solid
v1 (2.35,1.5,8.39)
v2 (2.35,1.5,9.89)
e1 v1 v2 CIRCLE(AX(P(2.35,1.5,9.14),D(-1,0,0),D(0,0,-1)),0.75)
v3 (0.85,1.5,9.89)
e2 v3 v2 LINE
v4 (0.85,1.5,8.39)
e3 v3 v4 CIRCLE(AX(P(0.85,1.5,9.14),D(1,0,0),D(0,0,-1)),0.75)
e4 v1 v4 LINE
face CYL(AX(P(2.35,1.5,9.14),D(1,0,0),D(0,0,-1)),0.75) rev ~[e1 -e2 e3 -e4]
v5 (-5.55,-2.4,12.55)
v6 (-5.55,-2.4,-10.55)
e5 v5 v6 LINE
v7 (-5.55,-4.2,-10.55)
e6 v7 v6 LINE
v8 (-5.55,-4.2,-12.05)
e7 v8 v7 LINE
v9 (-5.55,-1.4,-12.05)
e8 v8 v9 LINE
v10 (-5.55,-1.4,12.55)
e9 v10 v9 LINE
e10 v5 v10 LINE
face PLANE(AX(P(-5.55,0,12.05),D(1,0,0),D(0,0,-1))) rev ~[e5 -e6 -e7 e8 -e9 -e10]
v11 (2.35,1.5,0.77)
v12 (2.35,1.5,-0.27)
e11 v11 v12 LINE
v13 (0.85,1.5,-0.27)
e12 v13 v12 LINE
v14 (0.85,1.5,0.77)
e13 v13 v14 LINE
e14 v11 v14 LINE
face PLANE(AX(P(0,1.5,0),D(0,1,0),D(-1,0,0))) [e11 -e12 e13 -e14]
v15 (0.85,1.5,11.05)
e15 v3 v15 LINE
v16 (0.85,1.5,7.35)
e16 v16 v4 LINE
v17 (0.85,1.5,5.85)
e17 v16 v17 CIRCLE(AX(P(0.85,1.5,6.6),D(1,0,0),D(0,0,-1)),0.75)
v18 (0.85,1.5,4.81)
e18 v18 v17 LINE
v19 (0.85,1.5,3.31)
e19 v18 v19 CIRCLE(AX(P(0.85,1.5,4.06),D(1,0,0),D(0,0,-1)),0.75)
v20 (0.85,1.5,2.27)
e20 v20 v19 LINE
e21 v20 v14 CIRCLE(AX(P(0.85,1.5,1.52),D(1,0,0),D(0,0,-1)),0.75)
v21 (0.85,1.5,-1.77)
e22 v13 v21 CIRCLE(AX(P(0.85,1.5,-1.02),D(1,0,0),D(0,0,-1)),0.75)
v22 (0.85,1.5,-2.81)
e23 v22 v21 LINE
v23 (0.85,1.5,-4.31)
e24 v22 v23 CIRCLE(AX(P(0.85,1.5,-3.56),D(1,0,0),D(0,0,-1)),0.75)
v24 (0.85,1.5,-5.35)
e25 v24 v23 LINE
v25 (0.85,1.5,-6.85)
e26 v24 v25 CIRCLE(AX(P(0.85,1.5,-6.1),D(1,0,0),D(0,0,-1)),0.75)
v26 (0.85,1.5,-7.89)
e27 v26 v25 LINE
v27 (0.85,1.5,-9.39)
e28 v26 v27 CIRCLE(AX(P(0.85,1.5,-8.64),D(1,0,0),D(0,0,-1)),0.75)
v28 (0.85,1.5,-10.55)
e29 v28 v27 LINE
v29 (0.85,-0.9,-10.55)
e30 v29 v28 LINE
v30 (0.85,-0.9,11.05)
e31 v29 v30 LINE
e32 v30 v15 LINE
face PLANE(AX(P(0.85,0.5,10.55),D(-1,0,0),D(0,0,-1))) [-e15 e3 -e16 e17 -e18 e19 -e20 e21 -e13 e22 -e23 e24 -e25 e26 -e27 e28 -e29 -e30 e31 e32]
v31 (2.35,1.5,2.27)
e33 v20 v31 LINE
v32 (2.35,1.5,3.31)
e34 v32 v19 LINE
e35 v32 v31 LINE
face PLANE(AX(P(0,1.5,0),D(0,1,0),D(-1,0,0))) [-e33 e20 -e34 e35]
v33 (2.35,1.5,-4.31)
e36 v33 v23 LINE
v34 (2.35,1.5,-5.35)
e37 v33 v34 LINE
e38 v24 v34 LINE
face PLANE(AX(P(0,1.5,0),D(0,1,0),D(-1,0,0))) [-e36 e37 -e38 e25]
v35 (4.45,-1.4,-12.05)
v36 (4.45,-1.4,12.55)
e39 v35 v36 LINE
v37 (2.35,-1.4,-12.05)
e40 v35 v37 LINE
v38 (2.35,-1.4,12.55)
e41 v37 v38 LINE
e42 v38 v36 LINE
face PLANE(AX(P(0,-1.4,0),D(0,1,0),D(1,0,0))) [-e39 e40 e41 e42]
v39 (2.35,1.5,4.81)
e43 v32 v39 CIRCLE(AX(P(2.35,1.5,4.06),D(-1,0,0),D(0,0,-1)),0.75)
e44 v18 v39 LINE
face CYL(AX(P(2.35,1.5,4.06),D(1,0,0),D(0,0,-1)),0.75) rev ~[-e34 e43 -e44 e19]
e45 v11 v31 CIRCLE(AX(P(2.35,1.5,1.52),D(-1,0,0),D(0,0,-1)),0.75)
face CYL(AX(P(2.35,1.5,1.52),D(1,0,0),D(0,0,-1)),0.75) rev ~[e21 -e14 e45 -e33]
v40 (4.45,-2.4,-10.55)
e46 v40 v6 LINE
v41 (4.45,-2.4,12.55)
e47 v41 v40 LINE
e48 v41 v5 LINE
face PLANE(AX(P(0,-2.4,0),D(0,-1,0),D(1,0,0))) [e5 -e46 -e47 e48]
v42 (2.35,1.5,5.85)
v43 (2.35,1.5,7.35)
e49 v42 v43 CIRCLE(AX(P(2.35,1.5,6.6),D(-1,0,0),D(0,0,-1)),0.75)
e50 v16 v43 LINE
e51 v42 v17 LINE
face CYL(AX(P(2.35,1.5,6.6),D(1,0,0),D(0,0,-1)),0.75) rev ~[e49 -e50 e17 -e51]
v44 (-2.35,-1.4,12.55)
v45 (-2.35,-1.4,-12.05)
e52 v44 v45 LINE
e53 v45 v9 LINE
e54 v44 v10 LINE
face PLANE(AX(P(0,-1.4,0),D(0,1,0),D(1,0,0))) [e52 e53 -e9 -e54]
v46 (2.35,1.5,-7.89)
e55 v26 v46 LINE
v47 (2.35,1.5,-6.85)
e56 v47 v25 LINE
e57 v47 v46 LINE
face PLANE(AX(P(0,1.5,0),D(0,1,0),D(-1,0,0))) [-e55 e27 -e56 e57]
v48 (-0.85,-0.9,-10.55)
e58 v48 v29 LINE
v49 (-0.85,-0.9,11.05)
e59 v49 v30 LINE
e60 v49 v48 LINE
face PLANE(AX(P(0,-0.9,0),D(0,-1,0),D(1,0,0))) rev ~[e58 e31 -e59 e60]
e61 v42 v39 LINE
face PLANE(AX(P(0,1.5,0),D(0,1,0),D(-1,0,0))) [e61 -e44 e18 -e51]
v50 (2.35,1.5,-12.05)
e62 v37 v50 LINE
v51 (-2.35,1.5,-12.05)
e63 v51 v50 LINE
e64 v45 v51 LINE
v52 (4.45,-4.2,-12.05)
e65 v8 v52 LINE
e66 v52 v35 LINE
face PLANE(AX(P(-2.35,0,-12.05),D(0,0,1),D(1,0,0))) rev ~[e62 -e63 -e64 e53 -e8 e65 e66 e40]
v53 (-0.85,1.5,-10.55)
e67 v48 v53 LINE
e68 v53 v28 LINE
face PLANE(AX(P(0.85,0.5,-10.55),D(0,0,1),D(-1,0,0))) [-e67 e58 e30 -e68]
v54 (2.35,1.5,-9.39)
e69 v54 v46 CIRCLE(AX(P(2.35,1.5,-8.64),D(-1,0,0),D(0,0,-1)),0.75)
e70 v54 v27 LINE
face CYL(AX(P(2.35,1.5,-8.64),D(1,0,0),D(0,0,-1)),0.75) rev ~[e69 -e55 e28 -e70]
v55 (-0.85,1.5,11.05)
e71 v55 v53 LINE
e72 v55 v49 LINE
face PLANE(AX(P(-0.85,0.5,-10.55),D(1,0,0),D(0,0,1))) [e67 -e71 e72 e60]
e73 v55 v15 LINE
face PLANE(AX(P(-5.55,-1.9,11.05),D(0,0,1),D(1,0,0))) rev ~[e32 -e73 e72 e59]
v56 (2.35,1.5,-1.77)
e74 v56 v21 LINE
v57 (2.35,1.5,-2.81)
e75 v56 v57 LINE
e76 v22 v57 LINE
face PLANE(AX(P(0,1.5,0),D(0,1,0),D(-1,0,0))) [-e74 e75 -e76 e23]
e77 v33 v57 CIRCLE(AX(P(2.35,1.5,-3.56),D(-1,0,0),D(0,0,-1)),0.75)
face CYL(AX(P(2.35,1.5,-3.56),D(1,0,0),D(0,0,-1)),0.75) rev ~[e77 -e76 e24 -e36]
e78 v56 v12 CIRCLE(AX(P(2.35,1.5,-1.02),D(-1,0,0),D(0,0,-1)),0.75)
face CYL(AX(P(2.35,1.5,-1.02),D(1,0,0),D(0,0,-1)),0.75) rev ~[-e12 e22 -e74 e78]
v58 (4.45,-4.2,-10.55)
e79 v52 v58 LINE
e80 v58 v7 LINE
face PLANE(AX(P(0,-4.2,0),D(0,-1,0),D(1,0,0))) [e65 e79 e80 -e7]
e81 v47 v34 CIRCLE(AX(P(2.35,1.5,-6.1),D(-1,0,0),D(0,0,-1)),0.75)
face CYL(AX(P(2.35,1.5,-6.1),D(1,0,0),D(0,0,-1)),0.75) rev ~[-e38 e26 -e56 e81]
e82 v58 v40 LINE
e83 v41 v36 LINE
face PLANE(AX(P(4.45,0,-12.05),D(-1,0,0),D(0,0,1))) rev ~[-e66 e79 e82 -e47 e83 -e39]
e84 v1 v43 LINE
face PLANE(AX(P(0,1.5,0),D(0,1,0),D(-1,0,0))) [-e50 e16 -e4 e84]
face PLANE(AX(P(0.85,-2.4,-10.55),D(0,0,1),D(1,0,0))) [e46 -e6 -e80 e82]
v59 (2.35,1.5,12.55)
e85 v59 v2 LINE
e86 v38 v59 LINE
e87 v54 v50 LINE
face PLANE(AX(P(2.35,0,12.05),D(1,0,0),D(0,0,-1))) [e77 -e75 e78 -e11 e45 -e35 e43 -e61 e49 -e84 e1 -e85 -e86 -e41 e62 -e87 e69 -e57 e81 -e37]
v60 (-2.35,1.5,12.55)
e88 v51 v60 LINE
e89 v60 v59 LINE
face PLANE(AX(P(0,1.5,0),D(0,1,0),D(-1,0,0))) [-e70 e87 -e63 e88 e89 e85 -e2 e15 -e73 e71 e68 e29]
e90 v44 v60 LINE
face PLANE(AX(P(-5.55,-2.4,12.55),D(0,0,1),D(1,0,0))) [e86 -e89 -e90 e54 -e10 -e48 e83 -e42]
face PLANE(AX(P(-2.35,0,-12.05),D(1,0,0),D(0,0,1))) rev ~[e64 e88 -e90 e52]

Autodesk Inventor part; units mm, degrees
ref_plane "YZ Plane" through (0, 0, 0) normal (1, 0, 0) x (0, 1, 0)
ref_plane "XZ Plane" through (0, 0, 0) normal (0, 1, 0) x (-1, 0, 0)
ref_plane "XY Plane" through (0, 0, 0) normal (0, 0, 1) x (1, 0, 0)
sketch "Sketch1" plane through (0, 0, 0) normal (0, 1, 0) x (-1, 0, 0)
  line L0 (0.85, 10.55) -> (-0.85, 10.55)
  line L1 (-0.85, 10.55) -> (-0.85, -10.55)
  line L2 (-0.85, -10.55) -> (0.85, -10.55)
  line L3 (0.85, -10.55) -> (0.85, 10.55)
  line L4 (0.85, 10.55) -> (-0.85, -10.55) construction
  line L5 (-0.85, 10.55) -> (0.85, -10.55) construction
  line L6 (2.35, 12.05) -> (-2.35, 12.05)
  line L7 (-2.35, 12.05) -> (-2.35, -12.05)
  line L8 (-2.35, -12.05) -> (2.35, -12.05)
  line L9 (2.35, -12.05) -> (2.35, 12.05)
  point P0 (0, 0)
  dimension "d0" = 1.7
  dimension "d1" = 21.1
  dimension "d2" = 1.5
extrude "Extrusion1" add sketch "Sketch1" along normal blind 1.5
sketch "Sketch2" plane through (0, 0, 0) normal (0, -1, 0) x (1, 0, 0)
  line L0 (4.95, 12.05) -> (-6.05, 12.05)
  line L1 (-6.05, 12.05) -> (-6.05, -12.05)
  line L2 (-6.05, -12.05) -> (4.95, -12.05)
  line L3 (4.95, -12.05) -> (4.95, 12.05)
  line L4 (-2.35, 12.05) -> (2.35, 12.05) projected
  line L5 (-2.35, -12.05) -> (-2.35, 12.05) projected
  dimension "d5" = 11
  dimension "d6" = 3.7
extrude "Extrusion2" add sketch "Sketch2" along normal blind 2.4
sketch "Sketch3" plane through (0, 0, 0) normal (0, 1, 0) x (1, 0, 0)
  line L0 (-2.35, 12.05) -> (-2.35, -12.05) projected
  line L1 (-6.05, 12.05) -> (-2.35, 12.05) projected
  line L2 (-6.05, -12.05) -> (-6.05, 12.05) projected
  line L3 (-2.35, -12.05) -> (-6.05, -12.05) projected
  line L4 (2.35, -12.05) -> (2.35, 12.05) projected
  line L5 (4.95, -12.05) -> (2.35, -12.05) projected
  line L6 (4.95, 12.05) -> (4.95, -12.05) projected
  line L7 (2.35, 12.05) -> (4.95, 12.05) projected
  point P0 (0, 0)
extrude "Extrusion3" cut sketch "Sketch3" against normal blind 1.4
move faces "Move1" translate (0, 0, -1.5) faces at (0.7833, 0.5333, 12.05)
sketch "Sketch4" plane through (0, -2.4, 0) normal (0, -1, 0) x (1, 0, 0)
  line L0 (-0.85, -10.55) -> (0.85, -10.55) projected
  line L1 (-6.05, 10.55) -> (-6.05, -12.05) projected
  line L2 (2.35, -12.05) -> (4.95, -12.05) projected
  line L3 (-6.05, -10.55) -> (4.95, -10.55)
  line L4 (4.95, -10.55) -> (4.95, -12.05)
  line L5 (4.95, -12.05) -> (-6.05, -12.05)
  line L6 (-6.05, -12.05) -> (-6.05, -10.55)
  point P0 (0, 0)
extrude "Extrusion4" add sketch "Sketch4" along normal blind 1.8
move faces "Move2" translate (0, -1.4, 0) faces at (-0.2833, 0, 3.5167)
move faces "Move3" translate (0.5, 0, 0) faces at (-6.05, -1.7333, -4.0167)
move faces "Move4" translate (-0.5, 0, 0) faces at (4.95, -1.7333, -4.0167)
move faces "Move5" translate (0, 0, 1) faces at (-0.65, -2.0667, 10.55)
sketch "Sketch5" plane through (-5.55, -2.4, 11.55) normal (0, 0, 1) x (1, 0, 0)
  line L0 (4.7, 1) -> (4.7, 3.9) projected
  line L1 (3.2, 3.9) -> (4.7, 3.9) projected
  line L2 (3.2, 1) -> (3.2, 3.9) projected
  line L3 (3.2, 1) -> (0, 1) projected
  line L4 (0, 1) -> (0, 0) projected
  line L5 (10, 0) -> (0, 0) projected
  line L6 (10, 1) -> (10, 0) projected
  line L7 (10, 1) -> (7.9, 1) projected
  line L8 (7.9, 1) -> (7.9, 3.9) projected
  line L9 (6.4, 3.9) -> (7.9, 3.9) projected
  line L10 (6.4, 1) -> (6.4, 3.9) projected
  line L11 (6.4, 1) -> (4.7, 1) projected
  line L12 (4.7, 3.9) -> (6.4, 3.9) projected
  line L13 (4.7, 3.9) -> (6.4, 3.9)
  point P0 (5.55, 2.4)
extrude "Extrusion5" add sketch "Sketch5" along normal blind 1
move faces "Move6" translate (0, 0, -0.5) faces at (-0.2833, 0.5333, 11.55)
move faces "Move7" translate (0, 0.5, 0) faces at (-0.85, 0.5333, -3.35) (-0.2833, -1.4, -3.35)
sketch "Sketch6" plane through (2.35, -1.4, -12.05) normal (1, 0, 0) x (0, 0, -1)
  line L0 (-1.5, 2.9) -> (-23.1, 2.9) projected
  circle A0 centre (-3.41, 2.9) radius 0.75
  circle A1 centre (-5.95, 2.9) radius 0.75
  circle A2 centre (-8.49, 2.9) radius 0.75
  circle A3 centre (-11.03, 2.9) radius 0.75
  circle A4 centre (-13.57, 2.9) radius 0.75
  circle A5 centre (-16.11, 2.9) radius 0.75
  circle A6 centre (-18.65, 2.9) radius 0.75
  circle A7 centre (-21.19, 2.9) radius 0.75
  point P0 (-12.05, 1.4)
  dimension "d36" = 1.5
  dimension "d39" = 2.54
  dimension "d44" = 1.91
  dimension "d45" = 1.91
extrude "Extrusion6" cut sketch "Sketch6" against normal blind 2
equation "\"d44\" = d45"
properties part number "gyro_holder"
